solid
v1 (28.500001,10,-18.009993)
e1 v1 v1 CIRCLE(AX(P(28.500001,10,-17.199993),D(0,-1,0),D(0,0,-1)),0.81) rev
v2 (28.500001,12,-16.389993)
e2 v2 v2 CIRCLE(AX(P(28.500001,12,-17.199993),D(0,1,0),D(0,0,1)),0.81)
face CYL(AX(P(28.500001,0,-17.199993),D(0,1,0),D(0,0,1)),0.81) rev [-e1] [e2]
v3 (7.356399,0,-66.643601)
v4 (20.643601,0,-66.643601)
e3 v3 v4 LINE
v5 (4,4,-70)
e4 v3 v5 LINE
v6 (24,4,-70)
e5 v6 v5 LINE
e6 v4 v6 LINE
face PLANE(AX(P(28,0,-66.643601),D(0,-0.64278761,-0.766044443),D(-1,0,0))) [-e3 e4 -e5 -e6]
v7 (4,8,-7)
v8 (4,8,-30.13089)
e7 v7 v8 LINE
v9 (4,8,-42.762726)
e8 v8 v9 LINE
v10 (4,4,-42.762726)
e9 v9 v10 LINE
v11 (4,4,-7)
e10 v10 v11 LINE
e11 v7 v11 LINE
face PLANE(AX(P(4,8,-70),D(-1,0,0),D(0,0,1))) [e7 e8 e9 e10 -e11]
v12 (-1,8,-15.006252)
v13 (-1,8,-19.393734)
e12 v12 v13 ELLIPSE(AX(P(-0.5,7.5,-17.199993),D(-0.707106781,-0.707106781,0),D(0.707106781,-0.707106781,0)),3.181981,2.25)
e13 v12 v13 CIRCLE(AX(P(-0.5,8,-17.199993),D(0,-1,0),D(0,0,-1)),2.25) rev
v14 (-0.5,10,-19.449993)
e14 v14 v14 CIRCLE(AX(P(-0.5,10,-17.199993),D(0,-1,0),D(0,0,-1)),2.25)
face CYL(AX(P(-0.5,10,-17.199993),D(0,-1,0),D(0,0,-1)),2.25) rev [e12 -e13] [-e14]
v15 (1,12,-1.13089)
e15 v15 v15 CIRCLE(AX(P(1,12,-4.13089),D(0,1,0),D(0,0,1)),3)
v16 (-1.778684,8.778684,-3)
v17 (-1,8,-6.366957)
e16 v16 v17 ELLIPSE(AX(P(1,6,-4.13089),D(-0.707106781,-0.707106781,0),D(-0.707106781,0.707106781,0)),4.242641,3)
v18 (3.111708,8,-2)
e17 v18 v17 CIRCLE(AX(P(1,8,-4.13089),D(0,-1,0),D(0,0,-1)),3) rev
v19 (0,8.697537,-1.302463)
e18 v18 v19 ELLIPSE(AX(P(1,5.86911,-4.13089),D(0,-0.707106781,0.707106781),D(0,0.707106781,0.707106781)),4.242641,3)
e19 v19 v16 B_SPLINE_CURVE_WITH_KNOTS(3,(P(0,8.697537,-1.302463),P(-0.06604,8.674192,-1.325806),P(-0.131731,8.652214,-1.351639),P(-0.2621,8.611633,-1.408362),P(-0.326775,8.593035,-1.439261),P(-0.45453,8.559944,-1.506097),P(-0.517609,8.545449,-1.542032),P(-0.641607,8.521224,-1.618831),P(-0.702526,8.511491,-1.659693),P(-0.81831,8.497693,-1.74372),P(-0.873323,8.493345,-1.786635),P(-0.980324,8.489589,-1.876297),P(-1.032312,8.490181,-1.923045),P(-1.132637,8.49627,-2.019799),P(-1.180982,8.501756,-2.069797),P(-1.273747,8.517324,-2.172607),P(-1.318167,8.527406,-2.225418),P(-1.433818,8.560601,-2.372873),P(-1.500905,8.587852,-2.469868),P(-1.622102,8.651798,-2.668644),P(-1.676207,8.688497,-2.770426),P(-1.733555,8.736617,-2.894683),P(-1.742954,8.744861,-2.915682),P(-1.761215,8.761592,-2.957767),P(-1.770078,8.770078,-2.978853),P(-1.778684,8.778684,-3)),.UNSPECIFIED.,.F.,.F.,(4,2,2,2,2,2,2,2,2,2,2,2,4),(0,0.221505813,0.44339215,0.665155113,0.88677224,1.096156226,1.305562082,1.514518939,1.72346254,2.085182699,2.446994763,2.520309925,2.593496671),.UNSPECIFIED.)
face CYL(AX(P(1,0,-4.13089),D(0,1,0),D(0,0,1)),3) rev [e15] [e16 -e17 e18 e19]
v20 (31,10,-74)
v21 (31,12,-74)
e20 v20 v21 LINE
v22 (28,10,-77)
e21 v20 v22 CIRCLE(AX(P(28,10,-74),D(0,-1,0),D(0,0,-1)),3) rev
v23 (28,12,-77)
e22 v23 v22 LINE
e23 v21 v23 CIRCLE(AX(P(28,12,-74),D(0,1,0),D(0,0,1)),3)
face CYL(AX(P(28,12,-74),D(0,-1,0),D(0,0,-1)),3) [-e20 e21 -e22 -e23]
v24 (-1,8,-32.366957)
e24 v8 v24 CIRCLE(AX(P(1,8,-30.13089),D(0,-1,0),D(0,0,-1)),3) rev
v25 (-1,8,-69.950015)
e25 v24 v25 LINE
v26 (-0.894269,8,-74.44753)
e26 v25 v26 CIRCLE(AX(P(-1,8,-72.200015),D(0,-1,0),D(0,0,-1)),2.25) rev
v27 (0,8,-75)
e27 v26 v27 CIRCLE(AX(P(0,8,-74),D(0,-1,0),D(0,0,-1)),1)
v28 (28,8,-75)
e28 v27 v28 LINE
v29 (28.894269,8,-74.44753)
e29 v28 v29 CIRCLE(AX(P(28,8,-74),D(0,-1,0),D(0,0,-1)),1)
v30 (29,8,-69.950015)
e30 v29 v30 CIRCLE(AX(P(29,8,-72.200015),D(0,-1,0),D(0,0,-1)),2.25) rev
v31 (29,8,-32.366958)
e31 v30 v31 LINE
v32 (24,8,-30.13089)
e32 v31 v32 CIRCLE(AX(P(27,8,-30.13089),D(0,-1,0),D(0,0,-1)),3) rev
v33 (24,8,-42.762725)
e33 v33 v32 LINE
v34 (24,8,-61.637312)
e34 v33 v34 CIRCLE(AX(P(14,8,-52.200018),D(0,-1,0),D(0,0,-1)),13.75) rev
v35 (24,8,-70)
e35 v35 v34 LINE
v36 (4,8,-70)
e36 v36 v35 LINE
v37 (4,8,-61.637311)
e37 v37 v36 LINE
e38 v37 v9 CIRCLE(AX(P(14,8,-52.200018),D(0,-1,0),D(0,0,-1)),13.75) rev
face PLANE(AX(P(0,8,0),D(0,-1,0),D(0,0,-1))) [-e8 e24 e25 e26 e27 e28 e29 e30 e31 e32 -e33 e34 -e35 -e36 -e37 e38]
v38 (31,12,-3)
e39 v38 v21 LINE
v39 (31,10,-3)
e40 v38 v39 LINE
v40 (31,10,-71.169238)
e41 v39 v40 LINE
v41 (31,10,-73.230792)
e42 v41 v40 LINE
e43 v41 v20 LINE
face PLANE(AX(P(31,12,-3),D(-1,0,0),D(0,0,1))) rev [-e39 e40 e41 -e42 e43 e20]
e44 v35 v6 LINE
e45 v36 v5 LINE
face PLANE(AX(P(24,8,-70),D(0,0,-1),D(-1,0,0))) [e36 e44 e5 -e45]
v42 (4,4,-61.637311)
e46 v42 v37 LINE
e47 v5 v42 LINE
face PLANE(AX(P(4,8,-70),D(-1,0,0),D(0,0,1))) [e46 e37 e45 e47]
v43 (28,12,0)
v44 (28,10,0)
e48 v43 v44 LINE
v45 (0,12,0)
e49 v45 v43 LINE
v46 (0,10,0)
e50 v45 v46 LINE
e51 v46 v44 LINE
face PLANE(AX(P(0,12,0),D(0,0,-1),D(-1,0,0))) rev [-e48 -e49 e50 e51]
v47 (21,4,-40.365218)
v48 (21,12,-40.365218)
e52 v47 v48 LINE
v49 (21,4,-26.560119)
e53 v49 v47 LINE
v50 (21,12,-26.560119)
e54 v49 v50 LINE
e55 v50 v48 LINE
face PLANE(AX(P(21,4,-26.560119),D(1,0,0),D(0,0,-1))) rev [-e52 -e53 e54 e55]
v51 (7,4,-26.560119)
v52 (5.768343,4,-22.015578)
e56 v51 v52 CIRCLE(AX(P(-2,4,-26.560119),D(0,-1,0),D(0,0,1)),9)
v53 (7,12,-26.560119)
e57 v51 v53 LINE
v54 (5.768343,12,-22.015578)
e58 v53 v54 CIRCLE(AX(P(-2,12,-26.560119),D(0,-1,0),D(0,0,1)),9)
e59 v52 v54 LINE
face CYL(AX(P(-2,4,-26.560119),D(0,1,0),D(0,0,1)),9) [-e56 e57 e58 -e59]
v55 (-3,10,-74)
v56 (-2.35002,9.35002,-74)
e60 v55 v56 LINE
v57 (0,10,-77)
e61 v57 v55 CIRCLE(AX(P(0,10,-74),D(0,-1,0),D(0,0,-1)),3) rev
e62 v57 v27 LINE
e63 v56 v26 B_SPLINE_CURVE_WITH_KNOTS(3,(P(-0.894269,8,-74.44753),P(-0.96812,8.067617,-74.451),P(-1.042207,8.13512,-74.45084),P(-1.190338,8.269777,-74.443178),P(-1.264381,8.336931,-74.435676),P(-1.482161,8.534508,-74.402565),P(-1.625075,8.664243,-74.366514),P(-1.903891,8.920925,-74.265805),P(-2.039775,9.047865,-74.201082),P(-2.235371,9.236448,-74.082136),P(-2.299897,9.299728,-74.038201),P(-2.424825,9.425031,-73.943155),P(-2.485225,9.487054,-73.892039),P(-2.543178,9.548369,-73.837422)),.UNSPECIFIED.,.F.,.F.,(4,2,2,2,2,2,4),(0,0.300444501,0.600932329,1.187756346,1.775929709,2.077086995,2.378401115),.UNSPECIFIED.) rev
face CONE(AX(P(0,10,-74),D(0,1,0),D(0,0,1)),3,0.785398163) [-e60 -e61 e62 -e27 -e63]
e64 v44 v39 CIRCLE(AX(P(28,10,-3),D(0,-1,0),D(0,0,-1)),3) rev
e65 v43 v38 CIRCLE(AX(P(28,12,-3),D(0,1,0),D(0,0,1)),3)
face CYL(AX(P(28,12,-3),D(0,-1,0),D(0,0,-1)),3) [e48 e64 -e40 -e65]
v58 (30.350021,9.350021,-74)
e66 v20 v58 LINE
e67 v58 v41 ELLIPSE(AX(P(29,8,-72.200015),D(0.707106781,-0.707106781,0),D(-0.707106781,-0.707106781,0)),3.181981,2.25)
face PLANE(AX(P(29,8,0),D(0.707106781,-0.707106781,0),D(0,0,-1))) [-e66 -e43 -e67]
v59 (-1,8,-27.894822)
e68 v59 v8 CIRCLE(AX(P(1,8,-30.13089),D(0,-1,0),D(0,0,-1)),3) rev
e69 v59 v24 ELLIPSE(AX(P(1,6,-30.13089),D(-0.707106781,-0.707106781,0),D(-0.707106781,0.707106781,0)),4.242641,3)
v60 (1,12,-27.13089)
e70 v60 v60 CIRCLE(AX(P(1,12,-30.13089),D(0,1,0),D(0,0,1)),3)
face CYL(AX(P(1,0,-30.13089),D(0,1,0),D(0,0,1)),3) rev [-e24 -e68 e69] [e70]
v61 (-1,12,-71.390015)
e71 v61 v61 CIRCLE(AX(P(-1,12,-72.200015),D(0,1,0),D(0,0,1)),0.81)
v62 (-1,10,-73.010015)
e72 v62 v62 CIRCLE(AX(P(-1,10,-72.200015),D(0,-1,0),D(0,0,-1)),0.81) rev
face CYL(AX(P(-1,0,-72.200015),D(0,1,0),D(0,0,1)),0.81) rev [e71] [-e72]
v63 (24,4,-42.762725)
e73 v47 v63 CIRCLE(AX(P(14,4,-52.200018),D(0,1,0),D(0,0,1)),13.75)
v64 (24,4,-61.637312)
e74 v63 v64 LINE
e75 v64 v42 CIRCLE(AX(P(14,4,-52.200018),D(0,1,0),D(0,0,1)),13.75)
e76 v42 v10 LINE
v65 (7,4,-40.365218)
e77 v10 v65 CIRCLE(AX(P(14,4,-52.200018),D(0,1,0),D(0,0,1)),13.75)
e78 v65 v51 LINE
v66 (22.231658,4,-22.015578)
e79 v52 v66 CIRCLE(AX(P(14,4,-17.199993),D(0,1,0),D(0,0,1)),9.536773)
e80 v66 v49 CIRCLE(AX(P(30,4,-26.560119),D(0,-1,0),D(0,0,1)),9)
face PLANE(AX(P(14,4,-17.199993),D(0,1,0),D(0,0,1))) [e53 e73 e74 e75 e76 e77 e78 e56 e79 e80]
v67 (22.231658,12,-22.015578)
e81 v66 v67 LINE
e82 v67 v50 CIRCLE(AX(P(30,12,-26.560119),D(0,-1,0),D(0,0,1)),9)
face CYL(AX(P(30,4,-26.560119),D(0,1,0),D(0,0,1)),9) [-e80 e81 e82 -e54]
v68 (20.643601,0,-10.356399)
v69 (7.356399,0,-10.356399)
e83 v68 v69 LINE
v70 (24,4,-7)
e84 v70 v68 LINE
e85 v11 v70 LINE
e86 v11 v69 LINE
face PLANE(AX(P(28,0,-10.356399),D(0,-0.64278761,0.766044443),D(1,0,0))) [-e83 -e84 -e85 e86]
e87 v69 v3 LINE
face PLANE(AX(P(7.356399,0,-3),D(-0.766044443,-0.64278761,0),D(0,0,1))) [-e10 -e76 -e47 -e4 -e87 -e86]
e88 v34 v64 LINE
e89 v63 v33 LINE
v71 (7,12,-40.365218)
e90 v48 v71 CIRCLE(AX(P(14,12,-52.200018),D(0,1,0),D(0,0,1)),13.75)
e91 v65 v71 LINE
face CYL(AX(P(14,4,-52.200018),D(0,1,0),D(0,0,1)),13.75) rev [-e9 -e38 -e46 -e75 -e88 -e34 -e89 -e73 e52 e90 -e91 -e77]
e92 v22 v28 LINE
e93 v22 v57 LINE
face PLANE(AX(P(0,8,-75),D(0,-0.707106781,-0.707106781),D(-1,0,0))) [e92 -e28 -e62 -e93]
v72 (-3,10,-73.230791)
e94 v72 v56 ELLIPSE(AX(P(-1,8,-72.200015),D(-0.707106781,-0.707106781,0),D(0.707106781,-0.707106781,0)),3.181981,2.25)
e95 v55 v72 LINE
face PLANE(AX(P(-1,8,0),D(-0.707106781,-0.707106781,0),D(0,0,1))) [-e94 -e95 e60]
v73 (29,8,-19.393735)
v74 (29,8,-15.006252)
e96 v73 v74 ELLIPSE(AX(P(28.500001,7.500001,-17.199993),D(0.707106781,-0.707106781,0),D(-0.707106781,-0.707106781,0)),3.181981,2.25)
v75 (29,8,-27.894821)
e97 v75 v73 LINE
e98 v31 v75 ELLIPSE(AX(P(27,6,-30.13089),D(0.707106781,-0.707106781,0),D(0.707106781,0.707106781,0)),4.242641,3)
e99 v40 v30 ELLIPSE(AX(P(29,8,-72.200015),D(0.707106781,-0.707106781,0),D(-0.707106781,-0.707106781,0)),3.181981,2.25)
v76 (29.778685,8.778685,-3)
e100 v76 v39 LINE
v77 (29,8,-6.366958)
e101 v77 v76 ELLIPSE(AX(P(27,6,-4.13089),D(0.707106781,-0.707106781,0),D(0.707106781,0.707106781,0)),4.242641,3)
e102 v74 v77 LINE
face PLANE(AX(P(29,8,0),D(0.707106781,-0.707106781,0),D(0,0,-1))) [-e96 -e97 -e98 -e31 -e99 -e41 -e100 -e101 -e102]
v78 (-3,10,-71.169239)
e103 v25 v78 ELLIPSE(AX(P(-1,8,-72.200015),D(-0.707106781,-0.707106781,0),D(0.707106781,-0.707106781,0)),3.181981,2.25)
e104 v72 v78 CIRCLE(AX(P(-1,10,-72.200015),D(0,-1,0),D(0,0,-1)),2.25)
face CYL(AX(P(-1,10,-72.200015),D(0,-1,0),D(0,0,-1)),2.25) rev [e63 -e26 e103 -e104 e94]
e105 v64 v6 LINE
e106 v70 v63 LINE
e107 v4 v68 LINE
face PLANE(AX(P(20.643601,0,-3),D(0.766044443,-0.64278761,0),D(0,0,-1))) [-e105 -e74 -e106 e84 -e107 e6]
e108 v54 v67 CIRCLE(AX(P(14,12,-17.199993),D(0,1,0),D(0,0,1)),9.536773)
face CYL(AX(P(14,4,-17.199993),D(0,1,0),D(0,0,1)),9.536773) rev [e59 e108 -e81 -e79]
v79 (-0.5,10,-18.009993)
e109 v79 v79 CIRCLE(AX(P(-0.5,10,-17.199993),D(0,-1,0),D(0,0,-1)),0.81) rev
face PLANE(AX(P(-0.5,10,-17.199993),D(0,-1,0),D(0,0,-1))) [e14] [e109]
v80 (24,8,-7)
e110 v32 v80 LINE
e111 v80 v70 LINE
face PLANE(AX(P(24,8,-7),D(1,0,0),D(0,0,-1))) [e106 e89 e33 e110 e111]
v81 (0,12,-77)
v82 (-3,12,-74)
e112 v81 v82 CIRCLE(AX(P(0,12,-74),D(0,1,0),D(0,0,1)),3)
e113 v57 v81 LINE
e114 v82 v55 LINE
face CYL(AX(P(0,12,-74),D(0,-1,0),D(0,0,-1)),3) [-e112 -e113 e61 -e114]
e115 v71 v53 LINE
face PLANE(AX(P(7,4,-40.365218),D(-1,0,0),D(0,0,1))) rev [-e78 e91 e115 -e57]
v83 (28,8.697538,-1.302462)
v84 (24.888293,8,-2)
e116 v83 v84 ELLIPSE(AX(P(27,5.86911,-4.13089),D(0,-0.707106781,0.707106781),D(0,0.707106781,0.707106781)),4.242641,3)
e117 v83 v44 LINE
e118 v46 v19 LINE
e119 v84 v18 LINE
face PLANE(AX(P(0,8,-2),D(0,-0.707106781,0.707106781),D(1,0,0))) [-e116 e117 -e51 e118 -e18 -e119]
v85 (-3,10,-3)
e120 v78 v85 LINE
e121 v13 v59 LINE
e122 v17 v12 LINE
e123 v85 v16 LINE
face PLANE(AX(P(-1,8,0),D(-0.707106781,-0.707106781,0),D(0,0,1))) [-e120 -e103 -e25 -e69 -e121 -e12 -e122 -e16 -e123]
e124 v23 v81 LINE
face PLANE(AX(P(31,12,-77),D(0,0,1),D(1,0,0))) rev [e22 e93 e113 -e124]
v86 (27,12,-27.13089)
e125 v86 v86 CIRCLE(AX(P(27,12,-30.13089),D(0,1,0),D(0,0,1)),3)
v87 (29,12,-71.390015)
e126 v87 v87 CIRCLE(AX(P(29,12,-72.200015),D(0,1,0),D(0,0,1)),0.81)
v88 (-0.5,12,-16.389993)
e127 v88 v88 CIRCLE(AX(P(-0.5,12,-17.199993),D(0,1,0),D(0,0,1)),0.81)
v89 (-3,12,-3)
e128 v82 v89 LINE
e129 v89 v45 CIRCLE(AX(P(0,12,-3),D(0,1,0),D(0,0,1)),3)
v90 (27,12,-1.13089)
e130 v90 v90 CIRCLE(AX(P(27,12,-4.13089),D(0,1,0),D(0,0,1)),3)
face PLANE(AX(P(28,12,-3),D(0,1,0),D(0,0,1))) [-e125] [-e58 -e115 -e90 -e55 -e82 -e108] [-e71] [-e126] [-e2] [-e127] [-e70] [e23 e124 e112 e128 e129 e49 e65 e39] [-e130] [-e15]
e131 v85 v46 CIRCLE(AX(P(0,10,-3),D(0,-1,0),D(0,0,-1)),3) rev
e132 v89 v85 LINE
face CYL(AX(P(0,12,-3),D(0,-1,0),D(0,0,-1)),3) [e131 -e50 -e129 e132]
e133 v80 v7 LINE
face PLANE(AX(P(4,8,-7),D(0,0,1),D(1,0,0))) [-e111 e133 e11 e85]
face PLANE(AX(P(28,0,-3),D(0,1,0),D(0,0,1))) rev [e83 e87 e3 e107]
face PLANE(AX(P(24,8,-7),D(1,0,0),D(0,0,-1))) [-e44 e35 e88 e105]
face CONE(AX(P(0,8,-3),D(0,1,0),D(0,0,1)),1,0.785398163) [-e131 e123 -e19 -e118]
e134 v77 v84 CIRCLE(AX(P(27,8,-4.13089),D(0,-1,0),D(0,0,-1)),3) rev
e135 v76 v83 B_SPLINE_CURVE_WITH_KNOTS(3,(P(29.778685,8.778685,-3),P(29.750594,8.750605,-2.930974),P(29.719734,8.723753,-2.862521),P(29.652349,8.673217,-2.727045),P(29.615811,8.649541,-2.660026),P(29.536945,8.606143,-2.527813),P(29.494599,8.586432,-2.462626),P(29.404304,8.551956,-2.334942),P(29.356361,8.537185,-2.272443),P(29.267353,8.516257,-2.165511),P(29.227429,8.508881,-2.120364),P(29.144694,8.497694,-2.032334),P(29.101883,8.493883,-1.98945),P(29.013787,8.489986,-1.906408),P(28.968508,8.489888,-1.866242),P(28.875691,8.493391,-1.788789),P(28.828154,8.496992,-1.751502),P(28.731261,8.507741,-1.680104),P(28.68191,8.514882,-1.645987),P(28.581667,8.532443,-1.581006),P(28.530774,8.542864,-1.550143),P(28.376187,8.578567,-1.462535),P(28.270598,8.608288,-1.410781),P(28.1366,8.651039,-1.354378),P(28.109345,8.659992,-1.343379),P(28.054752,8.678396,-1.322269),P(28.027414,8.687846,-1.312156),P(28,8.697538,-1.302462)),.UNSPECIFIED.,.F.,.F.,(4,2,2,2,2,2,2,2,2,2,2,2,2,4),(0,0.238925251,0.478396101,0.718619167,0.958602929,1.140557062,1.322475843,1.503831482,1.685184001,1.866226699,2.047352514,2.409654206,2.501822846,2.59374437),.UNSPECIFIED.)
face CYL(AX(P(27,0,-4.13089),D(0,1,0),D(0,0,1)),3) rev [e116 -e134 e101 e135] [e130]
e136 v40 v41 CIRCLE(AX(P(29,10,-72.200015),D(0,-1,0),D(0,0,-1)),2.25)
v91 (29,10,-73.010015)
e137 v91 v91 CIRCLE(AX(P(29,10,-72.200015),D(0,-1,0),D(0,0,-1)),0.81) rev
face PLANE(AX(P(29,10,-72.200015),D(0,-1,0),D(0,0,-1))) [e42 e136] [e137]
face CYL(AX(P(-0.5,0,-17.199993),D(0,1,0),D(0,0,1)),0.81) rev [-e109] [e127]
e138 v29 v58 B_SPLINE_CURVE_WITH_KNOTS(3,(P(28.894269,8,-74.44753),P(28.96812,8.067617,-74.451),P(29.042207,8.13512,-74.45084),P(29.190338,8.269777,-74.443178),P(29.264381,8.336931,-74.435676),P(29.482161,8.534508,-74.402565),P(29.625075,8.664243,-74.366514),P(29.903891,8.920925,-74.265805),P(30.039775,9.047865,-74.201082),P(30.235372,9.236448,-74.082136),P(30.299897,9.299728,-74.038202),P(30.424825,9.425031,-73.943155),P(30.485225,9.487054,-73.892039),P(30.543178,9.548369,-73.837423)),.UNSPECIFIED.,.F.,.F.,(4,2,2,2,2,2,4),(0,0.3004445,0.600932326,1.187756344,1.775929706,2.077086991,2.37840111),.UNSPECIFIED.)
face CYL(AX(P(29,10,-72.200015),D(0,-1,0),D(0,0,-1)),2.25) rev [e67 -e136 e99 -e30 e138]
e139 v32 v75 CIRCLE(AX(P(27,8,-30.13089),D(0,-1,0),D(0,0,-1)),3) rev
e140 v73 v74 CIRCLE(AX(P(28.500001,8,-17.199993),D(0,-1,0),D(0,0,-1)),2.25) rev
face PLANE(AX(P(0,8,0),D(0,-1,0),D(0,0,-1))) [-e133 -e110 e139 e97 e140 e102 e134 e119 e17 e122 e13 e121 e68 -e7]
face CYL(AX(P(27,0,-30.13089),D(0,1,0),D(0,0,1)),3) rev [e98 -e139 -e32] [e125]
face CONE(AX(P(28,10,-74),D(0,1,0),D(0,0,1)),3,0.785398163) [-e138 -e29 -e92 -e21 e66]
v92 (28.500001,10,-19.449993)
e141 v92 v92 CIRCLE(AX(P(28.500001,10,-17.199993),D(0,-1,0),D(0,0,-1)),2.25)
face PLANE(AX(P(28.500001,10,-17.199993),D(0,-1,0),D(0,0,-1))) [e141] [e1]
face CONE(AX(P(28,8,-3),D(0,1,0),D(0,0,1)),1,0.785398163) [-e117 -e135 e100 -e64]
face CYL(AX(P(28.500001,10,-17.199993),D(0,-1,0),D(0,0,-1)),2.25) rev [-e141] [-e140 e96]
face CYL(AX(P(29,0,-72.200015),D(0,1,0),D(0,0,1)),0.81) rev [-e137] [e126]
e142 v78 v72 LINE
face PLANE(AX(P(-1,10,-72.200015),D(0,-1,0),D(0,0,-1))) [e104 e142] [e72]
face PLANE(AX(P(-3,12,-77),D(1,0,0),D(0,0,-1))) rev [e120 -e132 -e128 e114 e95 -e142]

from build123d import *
from OCP.BRepFilletAPI import BRepFilletAPI_MakeChamfer

# Parameters (mm, degrees)
EXTRUDE_1_DEPTH     = 12
SKETCH_2_R          = 3
SKETCH_2_R_2        = 0.81
CUT_EXTRUDE_1_DEPTH = 12
CUT_EXTRUDE_2_DEPTH = 8
FILLET_1_R          = 3
SKETCH_4_R          = 2.25
CUT_EXTRUDE_3_DEPTH = 10
SKETCH_5_W          = 20
SKETCH_5_H          = 63
CUT_EXTRUDE_4_DEPTH = 8
CHAMFER_4_SIZE      = 3.356398525
CHAMFER_4_SIZE_2    = 4
CHAMFER_5_SIZE      = 2


# Some blends are built 0.0001 mm under size
with BuildPart() as part:
    # 草图1 → 凸台-拉伸1 (new body)
    with BuildSketch(Plane(origin=(0, 0, 0), x_dir=(1, 0, 0), z_dir=(0, 1, 0))):
        with BuildLine():
            Line((0, 0), (28, 0))
            ThreePointArc((28, 0), (30.121320344, 0.878679656), (31, 3))
            Line((31, 3), (31, 77))
            Line((31, 77), (-3, 77))
            Line((-3, 77), (-3, 3))
            ThreePointArc((-3, 3), (-2.121320344, 0.878679656), (0, 0))
        make_face()
    extrude(amount=EXTRUDE_1_DEPTH)

    # 草图2 → 切除-拉伸1 (cut)
    with BuildSketch(Plane(origin=(14.000000253, 12, -382.2), x_dir=(1, 0, 0), z_dir=(0, 1, 0))):
        with Locations(Location((13, -352.069110398, 0), (0, 0, 270))):
            Circle(SKETCH_2_R)
        with Locations(Location((-13, -352.069110398, 0), (0, 0, 270))):
            Circle(SKETCH_2_R)
        with Locations(Location((13, -378.069110398, 0), (0, 0, 270))):
            Circle(SKETCH_2_R)
        with Locations(Location((-13, -378.069110398, 0), (0, 0, 270))):
            Circle(SKETCH_2_R)
        with Locations(Location((-15.000000143, -309.999984702, 0), (0, 0, 270))):
            Circle(SKETCH_2_R_2)
        with Locations(Location((15.000000143, -309.999984702, 0), (0, 0, 270))):
            Circle(SKETCH_2_R_2)
        with Locations(Location((14.500000253, -365.000006616, 0), (0, 0, 270))):
            Circle(SKETCH_2_R_2)
        with Locations(Location((-14.500000253, -365.000006616, 0), (0, 0, 270))):
            Circle(SKETCH_2_R_2)
    extrude(amount=-CUT_EXTRUDE_1_DEPTH, mode=Mode.SUBTRACT)

    # 草图3 → 切除-拉伸2 (cut)
    with BuildSketch(Plane(origin=(14.000000253, 12, -382.2), x_dir=(1, 0, 0), z_dir=(0, 1, 0))):
        with BuildLine():
            Line((-7.000000134, -341.834781862), (-7.000000134, -355.639881164))
            ThreePointArc((-7.000000134, -355.639881164), (-7.313370109, -357.994123887), (-8.231657645, -360.184422392))
            ThreePointArc((-8.231657645, -360.184422392), (0, -374.536779603), (8.231657645, -360.184422392))
            ThreePointArc((8.231657645, -360.184422392), (7.313370109, -357.994123887), (7.000000134, -355.639881164))
            Line((7.000000134, -355.639881164), (7.000000134, -341.834782031))
            ThreePointArc((7.000000134, -341.834782031), (3.09e-07, -316.249981647), (-7.000000134, -341.834781862))
        make_face()
    extrude(amount=-CUT_EXTRUDE_2_DEPTH, mode=Mode.SUBTRACT)

    # 圆角1
    fillet_1_edges = [part.edges().sort_by_distance(p)[0] for p in [
        (-3, 6, -77),
        (31, 6, -77),
    ]]
    fillet(fillet_1_edges, radius=FILLET_1_R)

    # 草图4 → 切除-拉伸3 (cut)
    with BuildSketch(Plane.XZ):
        with Locations(Location((-0.5, -17.199993384, 0), (0, 0, 270))):
            Circle(SKETCH_4_R)
        with Locations(Location((28.500000507, -17.199993384, 0), (0, 0, 270))):
            Circle(SKETCH_4_R)
        with Locations((-0.99999989, -72.200015298)):
            Circle(SKETCH_4_R)
        with Locations((29.000000396, -72.200015298)):
            Circle(SKETCH_4_R)
    extrude(amount=-CUT_EXTRUDE_3_DEPTH, mode=Mode.SUBTRACT)

    # 草图5 → 切除-拉伸4 (cut)
    with BuildSketch(Plane.XZ):
        Polygon((28, -77), (0, -77), (-3, -77), (-3, -71.169239105), (-3, -3), (-3, 0), (0, 0), (28, 0), (31, 0), (31, -3), (31, -71.169238122), (31, -77), align=None)
        with Locations((14, -38.5)):
            Rectangle(SKETCH_5_W, SKETCH_5_H, mode=Mode.SUBTRACT)
    extrude(amount=-CUT_EXTRUDE_4_DEPTH, mode=Mode.SUBTRACT)

    # 倒角4
    chamfer_4_edges_1 = [part.edges().sort_by_distance(p)[0] for p in [
        (24, 0, -38.5),
    ]]
    chamfer_4_side_1 = [part.faces().sort_by_distance(p)[0] for p in [
        (23.93287203, 0, -38.5),
    ]]
    chamfer_4_edges_2 = [part.edges().sort_by_distance(p)[0] for p in [
        (4, 0, -38.5),
    ]]
    chamfer_4_side_2 = [part.faces().sort_by_distance(p)[0] for p in [
        (4.06712797, 0, -38.5),
    ]]
    chamfer_4_edges_3 = [part.edges().sort_by_distance(p)[0] for p in [
        (14, 0, -7),
    ]]
    chamfer_4_side_3 = [part.faces().sort_by_distance(p)[0] for p in [
        (14, 0, -7.06712797),
    ]]
    chamfer_4_edges_4 = [part.edges().sort_by_distance(p)[0] for p in [
        (14, 0, -70),
    ]]
    chamfer_4_side_4 = [part.faces().sort_by_distance(p)[0] for p in [
        (14, 0, -69.93287203),
    ]]
    chamfer_4 = BRepFilletAPI_MakeChamfer(part.part.solid().wrapped)
    for e in chamfer_4_edges_1:
        chamfer_4.Add(CHAMFER_4_SIZE - 0.0001, CHAMFER_4_SIZE_2 - 0.0001, e.wrapped, chamfer_4_side_1[0].wrapped)
    for e in chamfer_4_edges_2:
        chamfer_4.Add(CHAMFER_4_SIZE - 0.0001, CHAMFER_4_SIZE_2 - 0.0001, e.wrapped, chamfer_4_side_2[0].wrapped)
    for e in chamfer_4_edges_3:
        chamfer_4.Add(CHAMFER_4_SIZE - 0.0001, CHAMFER_4_SIZE_2 - 0.0001, e.wrapped, chamfer_4_side_3[0].wrapped)
    for e in chamfer_4_edges_4:
        chamfer_4.Add(CHAMFER_4_SIZE - 0.0001, CHAMFER_4_SIZE_2 - 0.0001, e.wrapped, chamfer_4_side_4[0].wrapped)
    add(Compound.cast(chamfer_4.Shape()), mode=Mode.REPLACE)  # a hair under: the kernel refuses the full size

    # 倒角5
    # the kernel refuses this chamfer: 2 mm, written as the material it takes off along each edge
    with BuildSketch(Plane(origin=(28, 8, 0), x_dir=(0, -0.027495876610586494, -0.9996219169112968), z_dir=(-1, 0, 0)), Plane(origin=(0, 8, -77), x_dir=(0, -0.027495876610586414, 0.9996219169112968), z_dir=(1, 0, 0))) as chamfer_5_piece_1:
        Polygon((CHAMFER_5_SIZE * 0.999621916911, -CHAMFER_5_SIZE * 0.0274958766106), (-CHAMFER_5_SIZE * 0.0274958766106, -CHAMFER_5_SIZE * 0.999621916911), (0, 0), align=None)
    extrude(amount=28, mode=Mode.SUBTRACT)
    with BuildSketch(Plane(origin=(31, 8, -76.312604098), x_dir=(-0.9996219169112968, -0.02749587661058651, 0), z_dir=(0, 0, 1))) as chamfer_5_piece_2:
        Polygon((CHAMFER_5_SIZE * 0.999621916911, -CHAMFER_5_SIZE * 0.0274958766106), (-CHAMFER_5_SIZE * 0.0274958766106, -CHAMFER_5_SIZE * 0.999621916911), (0, 0), align=None)
    extrude(amount=73.312604098, mode=Mode.SUBTRACT)
    with BuildSketch(Plane(origin=(-3, 8, -68.087425514), x_dir=(0.9996219169112968, -0.027495876610586487, 0), z_dir=(0, 0, -1))) as chamfer_5_piece_3:
        Polygon((CHAMFER_5_SIZE * 0.999621916911, -CHAMFER_5_SIZE * 0.0274958766106), (-CHAMFER_5_SIZE * 0.0274958766106, -CHAMFER_5_SIZE * 0.999621916911), (0, 0), align=None)
    extrude(amount=5.912574486, mode=Mode.SUBTRACT)
    with BuildSketch(Plane(origin=(31, 8, -74), x_dir=(-0.9996219169112968, -0.02749587661058651, 0), z_dir=(0, 0, 1))) as chamfer_5_piece_4:
        Polygon((CHAMFER_5_SIZE * 0.999621916911, -CHAMFER_5_SIZE * 0.0274958766106), (-CHAMFER_5_SIZE * 0.0274958766106, -CHAMFER_5_SIZE * 0.999621916911), (0, 0), align=None)
    extrude(amount=5.912573503, mode=Mode.SUBTRACT)
    with BuildSketch(Plane(origin=(0, 8, -74), x_dir=(0, 0, -1), z_dir=(1, 0, 0))) as chamfer_5_piece_5:
        Polygon((3 - CHAMFER_5_SIZE, 0), (3, CHAMFER_5_SIZE), (3, 0), align=None)
    revolve(axis=Axis((0, 8, -74), (0, 1, 0)), revolution_arc=90, mode=Mode.SUBTRACT)
    with BuildSketch(Plane(origin=(28, 8, -74), x_dir=(1, 0, 0), z_dir=(0, 0, 1))) as chamfer_5_piece_6:
        Polygon((3 - CHAMFER_5_SIZE, 0), (3, CHAMFER_5_SIZE), (3, 0), align=None)
    revolve(axis=Axis((28, 8, -74), (0, 1, 0)), revolution_arc=90, mode=Mode.SUBTRACT)
    with BuildSketch(Plane(origin=(28, 8, -3), x_dir=(1, 0, 0), z_dir=(0, 0, -1))) as chamfer_5_piece_7:
        Polygon((3 - CHAMFER_5_SIZE, 0), (3, -CHAMFER_5_SIZE), (3, 0), align=None)
    revolve(axis=Axis((28, 8, -3), (0, -1, 0)), revolution_arc=90, mode=Mode.SUBTRACT)
    with BuildSketch(Plane(origin=(0, 8, -3), x_dir=(0, 0, 1), z_dir=(1, 0, 0))) as chamfer_5_piece_8:
        Polygon((3 - CHAMFER_5_SIZE, 0), (3, -CHAMFER_5_SIZE), (3, 0), align=None)
    revolve(axis=Axis((0, 8, -3), (0, -1, 0)), revolution_arc=90, mode=Mode.SUBTRACT)
    with BuildSketch(Plane(origin=(-3, 8, -3), x_dir=(0.9996219169112968, -0.027495876610586497, 0), z_dir=(0, 0, -1))) as chamfer_5_piece_9:
        Polygon((CHAMFER_5_SIZE * 0.999621916911, -CHAMFER_5_SIZE * 0.0274958766106), (-CHAMFER_5_SIZE * 0.0274958766106, -CHAMFER_5_SIZE * 0.999621916911), (0, 0), align=None)
    extrude(amount=73.312605081, mode=Mode.SUBTRACT)


solid = part.part
